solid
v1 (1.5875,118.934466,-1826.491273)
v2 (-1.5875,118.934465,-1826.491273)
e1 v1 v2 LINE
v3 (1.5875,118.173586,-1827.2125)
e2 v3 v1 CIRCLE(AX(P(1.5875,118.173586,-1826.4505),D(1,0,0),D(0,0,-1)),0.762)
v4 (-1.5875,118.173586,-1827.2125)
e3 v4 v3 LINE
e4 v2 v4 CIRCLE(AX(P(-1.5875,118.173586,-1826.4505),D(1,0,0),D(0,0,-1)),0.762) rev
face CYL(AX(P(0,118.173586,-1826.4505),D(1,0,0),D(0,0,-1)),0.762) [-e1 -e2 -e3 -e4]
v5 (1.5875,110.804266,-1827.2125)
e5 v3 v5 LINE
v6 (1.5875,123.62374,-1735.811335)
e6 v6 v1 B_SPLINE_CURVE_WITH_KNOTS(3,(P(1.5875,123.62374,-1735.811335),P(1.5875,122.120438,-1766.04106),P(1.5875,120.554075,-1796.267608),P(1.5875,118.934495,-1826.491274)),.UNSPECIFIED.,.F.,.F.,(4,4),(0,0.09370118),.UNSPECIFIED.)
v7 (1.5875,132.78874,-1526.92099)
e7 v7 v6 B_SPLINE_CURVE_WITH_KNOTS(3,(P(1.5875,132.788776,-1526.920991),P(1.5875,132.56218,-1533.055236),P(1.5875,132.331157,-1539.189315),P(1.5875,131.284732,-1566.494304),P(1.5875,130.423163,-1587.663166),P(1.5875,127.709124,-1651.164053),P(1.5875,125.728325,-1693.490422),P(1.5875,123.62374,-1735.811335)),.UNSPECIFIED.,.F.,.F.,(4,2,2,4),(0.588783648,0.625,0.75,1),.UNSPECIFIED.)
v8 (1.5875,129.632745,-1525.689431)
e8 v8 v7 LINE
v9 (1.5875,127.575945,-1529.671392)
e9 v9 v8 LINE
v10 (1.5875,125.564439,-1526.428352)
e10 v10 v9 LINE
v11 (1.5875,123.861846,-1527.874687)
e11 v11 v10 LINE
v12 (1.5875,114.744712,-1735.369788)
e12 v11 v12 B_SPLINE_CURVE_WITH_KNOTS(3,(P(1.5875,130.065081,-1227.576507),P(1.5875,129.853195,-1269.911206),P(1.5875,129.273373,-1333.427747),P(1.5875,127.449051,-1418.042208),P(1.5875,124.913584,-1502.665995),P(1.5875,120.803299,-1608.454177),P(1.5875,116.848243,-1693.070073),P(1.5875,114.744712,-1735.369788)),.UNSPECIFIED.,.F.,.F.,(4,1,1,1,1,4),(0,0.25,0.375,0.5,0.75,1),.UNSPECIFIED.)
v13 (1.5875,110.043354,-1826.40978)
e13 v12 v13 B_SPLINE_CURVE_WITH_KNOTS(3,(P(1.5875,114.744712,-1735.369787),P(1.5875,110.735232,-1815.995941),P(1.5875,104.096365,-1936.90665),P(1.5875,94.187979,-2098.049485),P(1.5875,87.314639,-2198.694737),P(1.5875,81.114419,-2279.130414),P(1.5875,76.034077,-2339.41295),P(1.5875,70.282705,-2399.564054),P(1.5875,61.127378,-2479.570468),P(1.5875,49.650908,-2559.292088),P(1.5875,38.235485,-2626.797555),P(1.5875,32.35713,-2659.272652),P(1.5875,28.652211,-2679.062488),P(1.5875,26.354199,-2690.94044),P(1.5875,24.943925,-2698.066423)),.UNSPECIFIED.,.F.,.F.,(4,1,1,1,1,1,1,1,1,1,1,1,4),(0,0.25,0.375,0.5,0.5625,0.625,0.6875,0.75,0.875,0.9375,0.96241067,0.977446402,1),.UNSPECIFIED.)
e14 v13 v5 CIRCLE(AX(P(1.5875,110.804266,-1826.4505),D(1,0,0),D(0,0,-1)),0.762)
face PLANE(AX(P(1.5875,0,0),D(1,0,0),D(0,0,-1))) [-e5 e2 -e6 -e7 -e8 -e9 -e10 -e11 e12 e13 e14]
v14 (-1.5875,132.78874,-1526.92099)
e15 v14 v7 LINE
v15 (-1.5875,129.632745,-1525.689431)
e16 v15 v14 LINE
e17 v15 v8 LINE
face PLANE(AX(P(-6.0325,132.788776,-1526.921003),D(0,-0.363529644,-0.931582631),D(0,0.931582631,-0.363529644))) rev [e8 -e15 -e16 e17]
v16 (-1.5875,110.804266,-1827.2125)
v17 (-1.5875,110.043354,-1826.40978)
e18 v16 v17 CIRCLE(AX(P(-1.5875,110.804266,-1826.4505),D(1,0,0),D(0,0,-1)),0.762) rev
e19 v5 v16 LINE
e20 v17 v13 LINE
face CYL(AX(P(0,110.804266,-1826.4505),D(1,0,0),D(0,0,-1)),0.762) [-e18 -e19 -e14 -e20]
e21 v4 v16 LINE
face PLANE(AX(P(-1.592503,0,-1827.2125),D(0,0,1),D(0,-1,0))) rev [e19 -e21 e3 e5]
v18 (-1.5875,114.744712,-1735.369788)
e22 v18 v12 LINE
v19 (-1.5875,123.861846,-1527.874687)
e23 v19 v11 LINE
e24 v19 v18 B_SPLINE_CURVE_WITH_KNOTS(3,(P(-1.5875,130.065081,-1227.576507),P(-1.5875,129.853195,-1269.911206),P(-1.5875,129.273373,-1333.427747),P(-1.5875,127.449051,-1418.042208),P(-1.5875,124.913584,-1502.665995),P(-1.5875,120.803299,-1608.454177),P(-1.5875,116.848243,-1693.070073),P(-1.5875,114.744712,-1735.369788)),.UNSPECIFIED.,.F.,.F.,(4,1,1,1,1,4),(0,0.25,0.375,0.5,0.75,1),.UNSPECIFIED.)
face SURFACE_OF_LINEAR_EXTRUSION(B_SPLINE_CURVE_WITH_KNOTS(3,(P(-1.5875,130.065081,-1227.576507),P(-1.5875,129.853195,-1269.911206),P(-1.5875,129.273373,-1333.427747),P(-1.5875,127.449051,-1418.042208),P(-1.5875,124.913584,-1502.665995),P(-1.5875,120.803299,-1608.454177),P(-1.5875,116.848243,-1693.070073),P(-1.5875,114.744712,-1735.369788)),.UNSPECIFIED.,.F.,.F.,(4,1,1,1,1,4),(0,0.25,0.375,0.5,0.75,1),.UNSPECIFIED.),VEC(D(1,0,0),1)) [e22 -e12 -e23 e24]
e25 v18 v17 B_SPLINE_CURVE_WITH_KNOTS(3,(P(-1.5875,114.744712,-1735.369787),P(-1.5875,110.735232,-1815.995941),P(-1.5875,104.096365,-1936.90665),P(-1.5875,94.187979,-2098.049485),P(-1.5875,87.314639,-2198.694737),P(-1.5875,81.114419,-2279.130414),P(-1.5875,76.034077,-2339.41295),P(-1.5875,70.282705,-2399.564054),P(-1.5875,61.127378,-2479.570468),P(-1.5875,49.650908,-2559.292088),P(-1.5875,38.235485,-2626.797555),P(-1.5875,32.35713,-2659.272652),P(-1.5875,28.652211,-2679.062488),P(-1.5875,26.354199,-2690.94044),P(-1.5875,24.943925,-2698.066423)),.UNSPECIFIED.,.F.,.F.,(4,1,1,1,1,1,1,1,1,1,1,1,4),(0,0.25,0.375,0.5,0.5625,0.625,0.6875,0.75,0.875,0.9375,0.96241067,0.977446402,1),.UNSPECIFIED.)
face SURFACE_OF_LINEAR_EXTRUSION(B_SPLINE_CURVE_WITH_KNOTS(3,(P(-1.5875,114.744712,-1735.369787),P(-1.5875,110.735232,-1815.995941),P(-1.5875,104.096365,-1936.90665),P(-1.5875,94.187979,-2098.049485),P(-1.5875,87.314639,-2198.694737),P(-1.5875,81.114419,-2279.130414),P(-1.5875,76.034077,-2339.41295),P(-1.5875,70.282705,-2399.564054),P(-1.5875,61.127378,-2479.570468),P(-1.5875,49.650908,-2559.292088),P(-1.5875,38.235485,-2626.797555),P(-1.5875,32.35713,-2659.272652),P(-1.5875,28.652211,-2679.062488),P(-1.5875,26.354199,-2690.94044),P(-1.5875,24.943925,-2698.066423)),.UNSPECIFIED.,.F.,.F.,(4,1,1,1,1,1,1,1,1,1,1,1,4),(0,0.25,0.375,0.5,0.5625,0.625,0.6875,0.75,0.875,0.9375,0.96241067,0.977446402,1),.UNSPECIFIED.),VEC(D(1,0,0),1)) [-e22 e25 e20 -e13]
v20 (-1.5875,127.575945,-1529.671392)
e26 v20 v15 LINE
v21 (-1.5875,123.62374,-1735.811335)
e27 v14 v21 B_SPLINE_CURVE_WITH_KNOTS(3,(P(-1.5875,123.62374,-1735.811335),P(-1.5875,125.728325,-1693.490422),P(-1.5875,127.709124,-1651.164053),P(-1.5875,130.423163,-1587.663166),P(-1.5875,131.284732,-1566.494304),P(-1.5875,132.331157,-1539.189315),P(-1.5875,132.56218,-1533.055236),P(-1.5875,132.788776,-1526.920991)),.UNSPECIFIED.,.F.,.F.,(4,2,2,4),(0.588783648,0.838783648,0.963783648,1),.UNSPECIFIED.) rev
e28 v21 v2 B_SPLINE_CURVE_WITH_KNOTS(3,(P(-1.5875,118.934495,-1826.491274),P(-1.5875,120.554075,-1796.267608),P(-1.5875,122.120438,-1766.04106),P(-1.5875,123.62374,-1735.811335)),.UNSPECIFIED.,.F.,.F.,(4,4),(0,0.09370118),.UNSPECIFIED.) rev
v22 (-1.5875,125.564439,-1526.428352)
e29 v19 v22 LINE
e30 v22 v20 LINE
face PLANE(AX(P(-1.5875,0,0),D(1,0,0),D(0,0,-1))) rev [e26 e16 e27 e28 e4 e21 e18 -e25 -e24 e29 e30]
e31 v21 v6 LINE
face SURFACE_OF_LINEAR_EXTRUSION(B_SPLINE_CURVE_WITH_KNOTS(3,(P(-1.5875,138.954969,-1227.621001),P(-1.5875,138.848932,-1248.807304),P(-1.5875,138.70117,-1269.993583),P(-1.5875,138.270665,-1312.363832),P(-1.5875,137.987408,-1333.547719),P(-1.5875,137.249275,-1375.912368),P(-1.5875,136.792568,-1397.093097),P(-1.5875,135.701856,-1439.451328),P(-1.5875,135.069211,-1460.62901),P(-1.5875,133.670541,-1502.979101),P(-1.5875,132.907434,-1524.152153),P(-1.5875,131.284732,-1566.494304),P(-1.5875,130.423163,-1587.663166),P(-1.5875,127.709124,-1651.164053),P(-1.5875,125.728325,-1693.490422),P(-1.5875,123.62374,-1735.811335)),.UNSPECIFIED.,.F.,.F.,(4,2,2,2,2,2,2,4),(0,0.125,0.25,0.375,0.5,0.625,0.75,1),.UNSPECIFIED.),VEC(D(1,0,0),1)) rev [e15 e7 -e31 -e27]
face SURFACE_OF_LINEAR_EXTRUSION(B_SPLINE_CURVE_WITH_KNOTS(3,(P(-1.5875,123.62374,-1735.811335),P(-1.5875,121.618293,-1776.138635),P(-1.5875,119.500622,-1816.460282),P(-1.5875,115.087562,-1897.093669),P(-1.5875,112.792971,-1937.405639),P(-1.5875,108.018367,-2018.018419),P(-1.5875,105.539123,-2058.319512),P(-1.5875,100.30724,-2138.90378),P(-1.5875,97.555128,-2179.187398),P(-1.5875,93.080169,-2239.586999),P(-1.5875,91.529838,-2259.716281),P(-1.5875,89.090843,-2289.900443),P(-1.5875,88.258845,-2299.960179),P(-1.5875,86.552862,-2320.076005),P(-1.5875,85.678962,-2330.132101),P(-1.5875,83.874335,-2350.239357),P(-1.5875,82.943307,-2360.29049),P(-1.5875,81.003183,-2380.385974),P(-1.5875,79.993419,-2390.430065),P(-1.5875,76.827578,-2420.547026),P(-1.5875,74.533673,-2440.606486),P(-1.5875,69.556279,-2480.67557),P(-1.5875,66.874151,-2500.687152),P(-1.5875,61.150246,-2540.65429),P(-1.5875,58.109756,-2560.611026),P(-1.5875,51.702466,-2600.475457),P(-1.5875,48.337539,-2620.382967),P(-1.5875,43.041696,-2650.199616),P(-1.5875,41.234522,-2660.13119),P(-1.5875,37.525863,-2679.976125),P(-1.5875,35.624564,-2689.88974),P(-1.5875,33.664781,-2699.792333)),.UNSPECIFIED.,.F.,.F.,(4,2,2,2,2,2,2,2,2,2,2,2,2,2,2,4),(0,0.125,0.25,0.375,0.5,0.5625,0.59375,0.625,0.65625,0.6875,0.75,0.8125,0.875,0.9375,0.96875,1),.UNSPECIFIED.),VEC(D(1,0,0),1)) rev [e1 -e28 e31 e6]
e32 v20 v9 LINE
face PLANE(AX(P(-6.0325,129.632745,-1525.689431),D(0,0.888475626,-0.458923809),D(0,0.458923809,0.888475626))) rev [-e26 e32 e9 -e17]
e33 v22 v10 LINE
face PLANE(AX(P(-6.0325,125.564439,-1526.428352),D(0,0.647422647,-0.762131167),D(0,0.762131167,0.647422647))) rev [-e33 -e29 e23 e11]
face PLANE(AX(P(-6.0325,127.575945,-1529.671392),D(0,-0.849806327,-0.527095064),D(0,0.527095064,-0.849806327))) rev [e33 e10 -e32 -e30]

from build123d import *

# Parameters (mm, degrees)
BOSS_EXTRUDE1_START = -1.5875
BOSS_EXTRUDE1_DEPTH = 3.175
FILLET1_R           = 2.54
CUT_EXTRUDE1_DEPTH  = 2674.191025632
FILLET2_R           = 0.762
FILLET3_R           = 0.762
SKETCH5_W           = 636.742492472
SKETCH5_H           = 356.774003564
CUT_EXTRUDE2_DEPTH  = 7.62


with BuildPart() as part:
    # Boss-Extrude1: read off the stored shape, not the designer's step
    # Boss-Extrude1 outline → Boss-Extrude1 (new body)
    with BuildSketch(Plane(origin=(0, 0, 0), x_dir=(0, 0, -1), z_dir=(1, 0, 0)).offset(BOSS_EXTRUDE1_START)):
        with BuildLine():
            add(Edge.make_bspline(
                [(1110.404970926, 130.384545774), (1120.170834465, 130.370061323), (1139.703057908, 130.338772026), (1168.998370974, 130.277673039), (1198.290610395, 130.194386876), (1217.81419633, 130.113940836), (1227.576506903, 130.06508052)],
                knots=[0, 0, 0, 0, 0.25, 0.5, 0.75, 1, 1, 1, 1], degree=3))
            add(Edge.make_bspline(
                [(1227.576506903, 130.06508052), (1269.911205773, 129.853195249), (1333.427746701, 129.273373321), (1418.042208161, 127.449050563), (1502.665994832, 124.913583682), (1608.454176987, 120.803299479), (1693.070073331, 116.848243245), (1735.369787733, 114.744712179)],
                knots=[0, 0, 0, 0, 0.25, 0.375, 0.5, 0.75, 1, 1, 1, 1], degree=3))
            add(Edge.make_bspline(
                [(1735.369787733, 114.744712179), (1815.995940723, 110.735232018), (1936.906650462, 104.096364548), (2098.049485168, 94.18797875), (2198.694736725, 87.314638509), (2279.130413747, 81.114418931), (2339.412950304, 76.034076608), (2399.564054334, 70.28270545), (2479.570468264, 61.127378254), (2559.292087872, 49.650907614), (2626.797554585, 38.235484735), (2656.889518578, 32.788503969), (2667.159793662, 30.877771266), (2669.54, 30.432069924)],
                knots=[0, 0, 0, 0, 0.25, 0.375, 0.5, 0.5625, 0.625, 0.6875, 0.75, 0.875, 0.9375, 0.96241067, 0.969928536, 0.969928536, 0.969928536, 0.969928536], degree=3))
            Line((2669.54, 30.432069924), (2669.54, 39.476142465))
            add(Edge.make_bspline(
                [(1735.811334709, 123.623740069), (1776.138635499, 121.618292624), (1816.460281579, 119.500621806), (1897.093668675, 115.087561885), (1937.405638896, 112.792971084), (2018.018419045, 108.018366523), (2058.319512223, 105.539122976), (2138.903780144, 100.307240032), (2179.18739793, 97.555127955), (2239.586998714, 93.080168687), (2259.716280977, 91.529837622), (2289.900442602, 89.09084343), (2299.960179135, 88.258845039), (2320.076004566, 86.552861654), (2330.132100898, 85.678962223), (2350.239356518, 83.874334847), (2360.290489794, 82.943307484), (2380.385973971, 81.003183297), (2390.430065378, 79.993418555), (2420.547026195, 76.827577532), (2440.60648589, 74.533672955), (2480.675569568, 69.556278523), (2500.68715183, 66.874150811), (2540.654290207, 61.150246295), (2560.611026428, 58.109755646), (2600.475457131, 51.702465574), (2620.382967089, 48.337538888), (2650.028116889, 43.072156367), (2659.78844051, 41.29687683), (2669.54, 39.476142465)],
                knots=[0, 0, 0, 0, 0.125, 0.125, 0.25, 0.25, 0.375, 0.375, 0.5, 0.5, 0.5625, 0.5625, 0.59375, 0.59375, 0.625, 0.625, 0.65625, 0.65625, 0.6875, 0.6875, 0.75, 0.75, 0.8125, 0.8125, 0.875, 0.875, 0.9375, 0.9375, 0.968210768, 0.968210768, 0.968210768, 0.968210768], degree=3))
            add(Edge.make_bspline(
                [(1227.621000751, 138.954969175), (1248.807303679, 138.848931677), (1269.993583155, 138.701170252), (1312.363832348, 138.270664618), (1333.547719008, 137.987407832), (1375.912368189, 137.249274813), (1397.09309738, 136.7925677), (1439.451328259, 135.701855835), (1460.629010312, 135.069210584), (1502.979101161, 133.670541385), (1524.152152736, 132.907434339), (1566.494303759, 131.284732459), (1587.663166024, 130.423163385), (1651.164052809, 127.709123983), (1693.490421561, 125.728325331), (1735.811334709, 123.623740069)],
                knots=[0, 0, 0, 0, 0.125, 0.125, 0.25, 0.25, 0.375, 0.375, 0.5, 0.5, 0.625, 0.625, 0.75, 0.75, 1, 1, 1, 1], degree=3))
            add(Edge.make_bspline(
                [(1110.418156307, 139.274535996), (1129.952027249, 139.245563914), (1149.485893504, 139.211997476), (1188.553558893, 139.115899087), (1208.087346834, 139.052735015), (1227.621000751, 138.954969175)],
                knots=[0, 0, 0, 0, 0.5, 0.5, 1, 1, 1, 1], degree=3))
            add(Edge.make_bspline(
                [(768.740124165, 138.468408213), (782.976796045, 138.460280143), (797.213453801, 138.479500079), (825.686695051, 138.549690296), (839.923258916, 138.600062665), (868.396318956, 138.719026333), (882.632808962, 138.789607972), (911.105746117, 138.939594729), (925.342197007, 139.018479563), (953.81517223, 139.160090703), (968.051699178, 139.222241505), (996.524919377, 139.30995407), (1010.761605517, 139.335014039), (1039.234912871, 139.349647552), (1053.471562869, 139.340493535), (1081.944860968, 139.313691902), (1096.181508981, 139.29565137), (1110.418156307, 139.274535996)],
                knots=[0, 0, 0, 0, 0.125, 0.125, 0.25, 0.25, 0.375, 0.375, 0.5, 0.5, 0.625, 0.625, 0.75, 0.75, 0.875, 0.875, 1, 1, 1, 1], degree=3))
            add(Edge.make_bspline(
                [(630.778432202, 139.251437536), (653.771819614, 139.075315664), (676.765000849, 138.871740519), (711.255349111, 138.647690701), (722.752238945, 138.586174182), (745.746099074, 138.499784896), (757.243084259, 138.474972158), (768.740124165, 138.468408213)],
                knots=[0, 0, 0, 0, 0.5, 0.5, 0.75, 0.75, 1, 1, 1, 1], degree=3))
            add(Edge.make_bspline(
                [(604.514984259, 139.433685568), (609.940743136, 139.400696354), (618.695242427, 139.342071397), (627.449694696, 139.276935028), (630.778432202, 139.251437536)],
                knots=[0, 0, 0, 0, 0.619765686, 1, 1, 1, 1], degree=3))
            ThreePointArc((604.514984259, 139.433685568), (600.549356142, 139.457173081), (596.583720644, 139.479379304))
            add(Edge.make_bspline(
                [(436.133018826, 139.357176562), (449.50393779, 139.390650739), (462.874888934, 139.412366015), (489.61665939, 139.498555977), (502.987497127, 139.559076553), (529.729299233, 139.628029754), (543.100240501, 139.639230481), (569.84212102, 139.601013959), (583.212960696, 139.552035302), (596.583720644, 139.479379304)],
                knots=[0, 0, 0, 0, 0.25, 0.25, 0.5, 0.5, 0.75, 0.75, 1, 1, 1, 1], degree=3))
            add(Edge.make_bspline(
                [(432.263917423, 139.347117104), (433.553617637, 139.350567112), (434.843318039, 139.353947814), (436.133018826, 139.357176562)],
                knots=[0, 0, 0, 0, 1, 1, 1, 1], degree=3))
            add(Edge.make_bspline(
                [(420.316232014, 139.305761868), (422.413235913, 139.315186344), (426.395793967, 139.330351666), (430.378363115, 139.342073082), (432.263917423, 139.347117104)],
                knots=[0, 0, 0, 0, 0.526548575, 1, 1, 1, 1], degree=3))
            add(Edge.make_bspline(
                [(376.410119779, 138.75403864), (383.726317086, 138.935561778), (391.043801196, 139.055611797), (405.679602634, 139.224192856), (412.997895507, 139.272871444), (420.316232014, 139.305761868)],
                knots=[0, 0, 0, 0, 0.5, 0.5, 1, 1, 1, 1], degree=3))
            add(Edge.make_bspline(
                [(336.49221538, 137.002990798), (349.782924989, 137.88646357), (363.094318653, 138.423658969), (376.410119779, 138.75403864)],
                knots=[0, 0, 0, 0, 1, 1, 1, 1], degree=3))
            add(Edge.make_bspline(
                [(322.369488076, 135.928469458), (327.073374868, 136.333386449), (331.781331813, 136.689844531), (336.49221538, 137.002990798)],
                knots=[0, 0, 0, 0, 1, 1, 1, 1], degree=3))
            add(Edge.make_bspline(
                [(269.769949315, 129.47895505), (274.123387467, 130.231879276), (278.485668028, 130.925946417), (287.22796256, 132.196043087), (291.608626646, 132.771988738), (300.381777496, 133.818422146), (304.774579419, 134.288963443), (313.567800313, 135.154375086), (317.967903853, 135.549407043), (322.369488076, 135.928469458)],
                knots=[0, 0, 0, 0, 0.25, 0.25, 0.5, 0.5, 0.75, 0.75, 1, 1, 1, 1], degree=3))
            add(Edge.make_bspline(
                [(135.15718457, 90.054634926), (146.043739673, 94.375230064), (156.99891695, 98.504335222), (173.56622243, 104.322560697), (179.110932848, 106.199810145), (190.24859245, 109.819698901), (195.841545849, 111.562316625), (207.065472514, 114.901345648), (212.697969124, 116.49836249), (224.005973618, 119.540534541), (229.683240596, 120.9862349), (246.767187276, 125.077694043), (258.225188059, 127.482295924), (269.769949315, 129.47895505)],
                knots=[0, 0, 0, 0, 0.25, 0.25, 0.375, 0.375, 0.5, 0.5, 0.625, 0.625, 0.75, 0.75, 1, 1, 1, 1], degree=3))
            add(Edge.make_bspline(
                [(107.049744533, 78.466050261), (116.373258882, 82.438606419), (125.737350123, 86.316143859), (135.15718457, 90.054634926)],
                knots=[0, 0, 0, 0, 1, 1, 1, 1], degree=3))
            add(Edge.make_bspline(
                [(99.06, 75.03568963), (99.223542669, 75.106424562), (100.635498802, 75.716852689), (103.297453866, 76.863328103), (105.798503999, 77.932922637), (107.049744533, 78.466050261)],
                knots=[0.484151133, 0.484151133, 0.484151133, 0.484151133, 0.515864471, 0.757931449, 1, 1, 1, 1], degree=3))
            Line((99.06, 75.03568963), (99.06, 65.345043949))
            add(Edge.make_bspline(
                [(99.06, 65.345043949), (99.380370965, 65.484464523), (100.637671455, 66.031176319), (103.17753745, 67.132002814), (106.681577323, 68.64166857), (109.249580285, 69.740028797), (110.534459652, 70.287489229)],
                knots=[0.254738807, 0.254738807, 0.254738807, 0.254738807, 0.317238807, 0.5, 0.75, 1, 1, 1, 1], degree=3))
            add(Edge.make_bspline(
                [(110.534459652, 70.287489229), (112.850658013, 71.274373329), (117.489277519, 73.236837099), (124.456688526, 76.138068453), (131.438476528, 78.994265342), (136.101204469, 80.864754132), (138.436571012, 81.791601309)],
                knots=[0, 0, 0, 0, 0.25, 0.5, 0.75, 1, 1, 1, 1], degree=3))
            add(Edge.make_bspline(
                [(138.436571012, 81.791601309), (143.826897197, 83.930883835), (154.6522834, 88.11877139), (176.408203186, 96.037596764), (203.906835742, 104.998187521), (237.39469787, 114.027149543), (259.934818065, 118.755998441), (271.284977744, 120.719001348)],
                knots=[0, 0, 0, 0, 0.125, 0.25, 0.5, 0.75, 1, 1, 1, 1], degree=3))
            add(Edge.make_bspline(
                [(271.284977744, 120.719001348), (275.558711595, 121.458140765), (284.124297478, 122.821139095), (297.036360548, 124.518896272), (310.018420247, 125.909880891), (318.766623126, 126.695286194), (323.13209925, 127.071239405)],
                knots=[5e-09, 5e-09, 5e-09, 5e-09, 0.2499992, 0.4999984, 0.7499976, 0.999996801, 0.999996801, 0.999996801, 0.999996801], degree=3))
            add(Edge.make_bspline(
                [(323.13209925, 127.071239405), (324.293050056, 127.171175344), (326.615168427, 127.365043892), (330.101568176, 127.638529754), (333.590184216, 127.895089457), (335.917953069, 128.055198639), (337.081858513, 128.132566852)],
                knots=[1.2024e-05, 1.2024e-05, 1.2024e-05, 1.2024e-05, 0.250009018, 0.500006012, 0.750003006, 1, 1, 1, 1], degree=3))
            add(Edge.make_bspline(
                [(337.081858513, 128.132566852), (340.367862287, 128.350997241), (346.939906877, 128.744909116), (356.821319657, 129.221190111), (366.716250393, 129.595096292), (373.326613137, 129.784797569), (376.630622597, 129.866773678)],
                knots=[0, 0, 0, 0, 0.25, 0.5, 0.75, 1, 1, 1, 1], degree=3))
            add(Edge.make_bspline(
                [(376.630622597, 129.866773678), (380.266394474, 129.956981294), (387.534764147, 130.106779908), (398.462206547, 130.259361028), (409.400972015, 130.358727994), (416.705417778, 130.39944419), (420.356185481, 130.415851648)],
                knots=[0, 0, 0, 0, 0.25, 0.5, 0.75, 1, 1, 1, 1], degree=3))
            add(Edge.make_bspline(
                [(420.356185481, 130.415851648), (421.350045129, 130.420318309), (423.337533562, 130.428603137), (426.320174328, 130.439402209), (429.303468332, 130.448883952), (431.293011648, 130.454488038), (432.287698861, 130.457148912)],
                knots=[0, 0, 0, 0, 0.25, 0.5, 0.75, 1, 1, 1, 1], degree=3))
            add(Edge.make_bspline(
                [(432.287698861, 130.457148912), (432.610032304, 130.45801117), (433.254717136, 130.45972707), (434.221637716, 130.462266911), (435.188505114, 130.464765142), (435.833012253, 130.466397641), (436.155274747, 130.46720442)],
                knots=[9.2e-08, 9.2e-08, 9.2e-08, 9.2e-08, 0.25, 0.5, 0.75, 1, 1, 1, 1], degree=3))
            add(Edge.make_bspline(
                [(436.155274747, 130.46720442), (449.528322363, 130.500683927), (476.275740382, 130.546633815), (516.38896029, 130.728798697), (556.456290895, 130.759667498), (583.176533448, 130.662101975), (596.535396133, 130.589510646)],
                knots=[0, 0, 0, 0, 0.249999973, 0.499999946, 0.749999918, 0.999999891, 0.999999891, 0.999999891, 0.999999891], degree=3))
            ThreePointArc((596.535396133, 130.589510646), (600.498158983, 130.567320504), (604.460914457, 130.543849998))
            add(Edge.make_bspline(
                [(604.460914457, 130.543849998), (606.648150431, 130.530551362), (611.022503017, 130.502867011), (617.584689429, 130.458405465), (624.147187284, 130.411339888), (628.522663802, 130.378455494), (630.7103385, 130.361698324)],
                knots=[-7.09e-07, -7.09e-07, -7.09e-07, -7.09e-07, 0.249999468, 0.499999646, 0.749999823, 1, 1, 1, 1], degree=3))
            add(Edge.make_bspline(
                [(630.7103385, 130.361698324), (642.206126489, 130.273644326), (665.193556095, 130.083785311), (699.699077953, 129.819212193), (734.21504011, 129.634735151), (757.228597075, 129.58497898), (768.735048644, 129.578409662)],
                knots=[0, 0, 0, 0, 0.25, 0.5, 0.75, 1, 1, 1, 1], degree=3))
            add(Edge.make_bspline(
                [(768.735048644, 129.578409662), (797.222409768, 129.56214552), (854.203652026, 129.725124503), (939.635195481, 130.236578518), (1024.992958464, 130.524931921), (1081.937612336, 130.426767717), (1110.404970926, 130.384545774)],
                knots=[0, 0, 0, 0, 0.25, 0.5, 0.75, 1, 1, 1, 1], degree=3))
        make_face()
    extrude(amount=BOSS_EXTRUDE1_DEPTH)

    # Fillet1
    fillet1_edges = [part.edges().sort_by_distance(p)[0] for p in [
        (0, 39.476142465, -2669.54),
        (0, 30.432069924, -2669.54),
        (0, 65.345043949, -99.06),
        (0, 75.03568963, -99.06),
    ]]
    fillet(fillet1_edges, radius=FILLET1_R)

    # Sketch4 → Cut-Extrude1 (cut, through all)
    with BuildSketch(Plane(origin=(1.5875, 0, 0), x_dir=(0, 0, -1), z_dir=(1, 0, 0))):
        Polygon((1827.2125, 118.895836595), (1827.2125, 110.000384115), (1827.2125, 78.791710134), (2135.1875, 78.791710134), (2135.1875, 91.599357392), (2135.1875, 100.508307819), (2135.1875, 129.353842083), (1827.2125, 129.353842083), align=None)
    extrude(amount=-CUT_EXTRUDE1_DEPTH, mode=Mode.SUBTRACT)


with BuildPart() as cut_extrude1_piece_1:
    # of the separate pieces the step leaves, piece 1, a body of its own (cut_extrude1_pieces)
    add(part.part.solids().sort_by_distance((-1.5875, 114.744712179, -1735.369787733))[0])

    # Fillet2
    fillet2_edges = [cut_extrude1_piece_1.edges().sort_by_distance(p)[0] for p in [
        (0, 118.895836595, -1827.2125),
        (0, 110.000384116, -1827.2125),
    ]]
    fillet(fillet2_edges, radius=FILLET2_R)


with BuildPart() as cut_extrude1_piece_2:
    # of the separate pieces the step leaves, piece 2, a body of its own (cut_extrude1_pieces)
    add(part.part.solids().sort_by_distance((-1.5875, 91.599357392, -2135.1875))[0])

    # Fillet3
    fillet3_edges = [cut_extrude1_piece_2.edges().sort_by_distance(p)[0] for p in [
        (0, 100.508307819, -2135.1875),
        (0, 91.599357392, -2135.1875),
    ]]
    fillet(fillet3_edges, radius=FILLET3_R)


with BuildPart() as cut_extrude2_tool:
    # Sketch5 → Cut-Extrude2 (new body)
    with BuildSketch(Plane(origin=(1.5875, 0, 0), x_dir=(0, 0, -1), z_dir=(1, 0, 0))):
        Polygon((1526.921002642, 132.788776067), (1525.689431031, 129.632745348), (1529.671392187, 127.575945218), (1526.428351657, 125.564439067), (1528.398437884, 123.245298517), (1528.398437884, 118.623114405), (-69.434984225, -369.526535585), (-528.734858547, 275.104866971), (1526.921002642, 184.452057857), align=None)
        with Locations((2399.198239347, 52.922681549)):
            Rectangle(SKETCH5_W, SKETCH5_H)
    extrude(amount=-CUT_EXTRUDE2_DEPTH)


with BuildPart() as cut_extrude1_piece_1_1:
    add(cut_extrude1_piece_1.part)

    # Cut-Extrude2: cut by cut_extrude2_tool
    add(cut_extrude2_tool.part, mode=Mode.SUBTRACT)


with BuildPart() as cut_extrude1_piece_2_1:
    add(cut_extrude1_piece_2.part)

    # Cut-Extrude2: cut by cut_extrude2_tool
    add(cut_extrude2_tool.part, mode=Mode.SUBTRACT)


solid = cut_extrude1_piece_1_1.part
